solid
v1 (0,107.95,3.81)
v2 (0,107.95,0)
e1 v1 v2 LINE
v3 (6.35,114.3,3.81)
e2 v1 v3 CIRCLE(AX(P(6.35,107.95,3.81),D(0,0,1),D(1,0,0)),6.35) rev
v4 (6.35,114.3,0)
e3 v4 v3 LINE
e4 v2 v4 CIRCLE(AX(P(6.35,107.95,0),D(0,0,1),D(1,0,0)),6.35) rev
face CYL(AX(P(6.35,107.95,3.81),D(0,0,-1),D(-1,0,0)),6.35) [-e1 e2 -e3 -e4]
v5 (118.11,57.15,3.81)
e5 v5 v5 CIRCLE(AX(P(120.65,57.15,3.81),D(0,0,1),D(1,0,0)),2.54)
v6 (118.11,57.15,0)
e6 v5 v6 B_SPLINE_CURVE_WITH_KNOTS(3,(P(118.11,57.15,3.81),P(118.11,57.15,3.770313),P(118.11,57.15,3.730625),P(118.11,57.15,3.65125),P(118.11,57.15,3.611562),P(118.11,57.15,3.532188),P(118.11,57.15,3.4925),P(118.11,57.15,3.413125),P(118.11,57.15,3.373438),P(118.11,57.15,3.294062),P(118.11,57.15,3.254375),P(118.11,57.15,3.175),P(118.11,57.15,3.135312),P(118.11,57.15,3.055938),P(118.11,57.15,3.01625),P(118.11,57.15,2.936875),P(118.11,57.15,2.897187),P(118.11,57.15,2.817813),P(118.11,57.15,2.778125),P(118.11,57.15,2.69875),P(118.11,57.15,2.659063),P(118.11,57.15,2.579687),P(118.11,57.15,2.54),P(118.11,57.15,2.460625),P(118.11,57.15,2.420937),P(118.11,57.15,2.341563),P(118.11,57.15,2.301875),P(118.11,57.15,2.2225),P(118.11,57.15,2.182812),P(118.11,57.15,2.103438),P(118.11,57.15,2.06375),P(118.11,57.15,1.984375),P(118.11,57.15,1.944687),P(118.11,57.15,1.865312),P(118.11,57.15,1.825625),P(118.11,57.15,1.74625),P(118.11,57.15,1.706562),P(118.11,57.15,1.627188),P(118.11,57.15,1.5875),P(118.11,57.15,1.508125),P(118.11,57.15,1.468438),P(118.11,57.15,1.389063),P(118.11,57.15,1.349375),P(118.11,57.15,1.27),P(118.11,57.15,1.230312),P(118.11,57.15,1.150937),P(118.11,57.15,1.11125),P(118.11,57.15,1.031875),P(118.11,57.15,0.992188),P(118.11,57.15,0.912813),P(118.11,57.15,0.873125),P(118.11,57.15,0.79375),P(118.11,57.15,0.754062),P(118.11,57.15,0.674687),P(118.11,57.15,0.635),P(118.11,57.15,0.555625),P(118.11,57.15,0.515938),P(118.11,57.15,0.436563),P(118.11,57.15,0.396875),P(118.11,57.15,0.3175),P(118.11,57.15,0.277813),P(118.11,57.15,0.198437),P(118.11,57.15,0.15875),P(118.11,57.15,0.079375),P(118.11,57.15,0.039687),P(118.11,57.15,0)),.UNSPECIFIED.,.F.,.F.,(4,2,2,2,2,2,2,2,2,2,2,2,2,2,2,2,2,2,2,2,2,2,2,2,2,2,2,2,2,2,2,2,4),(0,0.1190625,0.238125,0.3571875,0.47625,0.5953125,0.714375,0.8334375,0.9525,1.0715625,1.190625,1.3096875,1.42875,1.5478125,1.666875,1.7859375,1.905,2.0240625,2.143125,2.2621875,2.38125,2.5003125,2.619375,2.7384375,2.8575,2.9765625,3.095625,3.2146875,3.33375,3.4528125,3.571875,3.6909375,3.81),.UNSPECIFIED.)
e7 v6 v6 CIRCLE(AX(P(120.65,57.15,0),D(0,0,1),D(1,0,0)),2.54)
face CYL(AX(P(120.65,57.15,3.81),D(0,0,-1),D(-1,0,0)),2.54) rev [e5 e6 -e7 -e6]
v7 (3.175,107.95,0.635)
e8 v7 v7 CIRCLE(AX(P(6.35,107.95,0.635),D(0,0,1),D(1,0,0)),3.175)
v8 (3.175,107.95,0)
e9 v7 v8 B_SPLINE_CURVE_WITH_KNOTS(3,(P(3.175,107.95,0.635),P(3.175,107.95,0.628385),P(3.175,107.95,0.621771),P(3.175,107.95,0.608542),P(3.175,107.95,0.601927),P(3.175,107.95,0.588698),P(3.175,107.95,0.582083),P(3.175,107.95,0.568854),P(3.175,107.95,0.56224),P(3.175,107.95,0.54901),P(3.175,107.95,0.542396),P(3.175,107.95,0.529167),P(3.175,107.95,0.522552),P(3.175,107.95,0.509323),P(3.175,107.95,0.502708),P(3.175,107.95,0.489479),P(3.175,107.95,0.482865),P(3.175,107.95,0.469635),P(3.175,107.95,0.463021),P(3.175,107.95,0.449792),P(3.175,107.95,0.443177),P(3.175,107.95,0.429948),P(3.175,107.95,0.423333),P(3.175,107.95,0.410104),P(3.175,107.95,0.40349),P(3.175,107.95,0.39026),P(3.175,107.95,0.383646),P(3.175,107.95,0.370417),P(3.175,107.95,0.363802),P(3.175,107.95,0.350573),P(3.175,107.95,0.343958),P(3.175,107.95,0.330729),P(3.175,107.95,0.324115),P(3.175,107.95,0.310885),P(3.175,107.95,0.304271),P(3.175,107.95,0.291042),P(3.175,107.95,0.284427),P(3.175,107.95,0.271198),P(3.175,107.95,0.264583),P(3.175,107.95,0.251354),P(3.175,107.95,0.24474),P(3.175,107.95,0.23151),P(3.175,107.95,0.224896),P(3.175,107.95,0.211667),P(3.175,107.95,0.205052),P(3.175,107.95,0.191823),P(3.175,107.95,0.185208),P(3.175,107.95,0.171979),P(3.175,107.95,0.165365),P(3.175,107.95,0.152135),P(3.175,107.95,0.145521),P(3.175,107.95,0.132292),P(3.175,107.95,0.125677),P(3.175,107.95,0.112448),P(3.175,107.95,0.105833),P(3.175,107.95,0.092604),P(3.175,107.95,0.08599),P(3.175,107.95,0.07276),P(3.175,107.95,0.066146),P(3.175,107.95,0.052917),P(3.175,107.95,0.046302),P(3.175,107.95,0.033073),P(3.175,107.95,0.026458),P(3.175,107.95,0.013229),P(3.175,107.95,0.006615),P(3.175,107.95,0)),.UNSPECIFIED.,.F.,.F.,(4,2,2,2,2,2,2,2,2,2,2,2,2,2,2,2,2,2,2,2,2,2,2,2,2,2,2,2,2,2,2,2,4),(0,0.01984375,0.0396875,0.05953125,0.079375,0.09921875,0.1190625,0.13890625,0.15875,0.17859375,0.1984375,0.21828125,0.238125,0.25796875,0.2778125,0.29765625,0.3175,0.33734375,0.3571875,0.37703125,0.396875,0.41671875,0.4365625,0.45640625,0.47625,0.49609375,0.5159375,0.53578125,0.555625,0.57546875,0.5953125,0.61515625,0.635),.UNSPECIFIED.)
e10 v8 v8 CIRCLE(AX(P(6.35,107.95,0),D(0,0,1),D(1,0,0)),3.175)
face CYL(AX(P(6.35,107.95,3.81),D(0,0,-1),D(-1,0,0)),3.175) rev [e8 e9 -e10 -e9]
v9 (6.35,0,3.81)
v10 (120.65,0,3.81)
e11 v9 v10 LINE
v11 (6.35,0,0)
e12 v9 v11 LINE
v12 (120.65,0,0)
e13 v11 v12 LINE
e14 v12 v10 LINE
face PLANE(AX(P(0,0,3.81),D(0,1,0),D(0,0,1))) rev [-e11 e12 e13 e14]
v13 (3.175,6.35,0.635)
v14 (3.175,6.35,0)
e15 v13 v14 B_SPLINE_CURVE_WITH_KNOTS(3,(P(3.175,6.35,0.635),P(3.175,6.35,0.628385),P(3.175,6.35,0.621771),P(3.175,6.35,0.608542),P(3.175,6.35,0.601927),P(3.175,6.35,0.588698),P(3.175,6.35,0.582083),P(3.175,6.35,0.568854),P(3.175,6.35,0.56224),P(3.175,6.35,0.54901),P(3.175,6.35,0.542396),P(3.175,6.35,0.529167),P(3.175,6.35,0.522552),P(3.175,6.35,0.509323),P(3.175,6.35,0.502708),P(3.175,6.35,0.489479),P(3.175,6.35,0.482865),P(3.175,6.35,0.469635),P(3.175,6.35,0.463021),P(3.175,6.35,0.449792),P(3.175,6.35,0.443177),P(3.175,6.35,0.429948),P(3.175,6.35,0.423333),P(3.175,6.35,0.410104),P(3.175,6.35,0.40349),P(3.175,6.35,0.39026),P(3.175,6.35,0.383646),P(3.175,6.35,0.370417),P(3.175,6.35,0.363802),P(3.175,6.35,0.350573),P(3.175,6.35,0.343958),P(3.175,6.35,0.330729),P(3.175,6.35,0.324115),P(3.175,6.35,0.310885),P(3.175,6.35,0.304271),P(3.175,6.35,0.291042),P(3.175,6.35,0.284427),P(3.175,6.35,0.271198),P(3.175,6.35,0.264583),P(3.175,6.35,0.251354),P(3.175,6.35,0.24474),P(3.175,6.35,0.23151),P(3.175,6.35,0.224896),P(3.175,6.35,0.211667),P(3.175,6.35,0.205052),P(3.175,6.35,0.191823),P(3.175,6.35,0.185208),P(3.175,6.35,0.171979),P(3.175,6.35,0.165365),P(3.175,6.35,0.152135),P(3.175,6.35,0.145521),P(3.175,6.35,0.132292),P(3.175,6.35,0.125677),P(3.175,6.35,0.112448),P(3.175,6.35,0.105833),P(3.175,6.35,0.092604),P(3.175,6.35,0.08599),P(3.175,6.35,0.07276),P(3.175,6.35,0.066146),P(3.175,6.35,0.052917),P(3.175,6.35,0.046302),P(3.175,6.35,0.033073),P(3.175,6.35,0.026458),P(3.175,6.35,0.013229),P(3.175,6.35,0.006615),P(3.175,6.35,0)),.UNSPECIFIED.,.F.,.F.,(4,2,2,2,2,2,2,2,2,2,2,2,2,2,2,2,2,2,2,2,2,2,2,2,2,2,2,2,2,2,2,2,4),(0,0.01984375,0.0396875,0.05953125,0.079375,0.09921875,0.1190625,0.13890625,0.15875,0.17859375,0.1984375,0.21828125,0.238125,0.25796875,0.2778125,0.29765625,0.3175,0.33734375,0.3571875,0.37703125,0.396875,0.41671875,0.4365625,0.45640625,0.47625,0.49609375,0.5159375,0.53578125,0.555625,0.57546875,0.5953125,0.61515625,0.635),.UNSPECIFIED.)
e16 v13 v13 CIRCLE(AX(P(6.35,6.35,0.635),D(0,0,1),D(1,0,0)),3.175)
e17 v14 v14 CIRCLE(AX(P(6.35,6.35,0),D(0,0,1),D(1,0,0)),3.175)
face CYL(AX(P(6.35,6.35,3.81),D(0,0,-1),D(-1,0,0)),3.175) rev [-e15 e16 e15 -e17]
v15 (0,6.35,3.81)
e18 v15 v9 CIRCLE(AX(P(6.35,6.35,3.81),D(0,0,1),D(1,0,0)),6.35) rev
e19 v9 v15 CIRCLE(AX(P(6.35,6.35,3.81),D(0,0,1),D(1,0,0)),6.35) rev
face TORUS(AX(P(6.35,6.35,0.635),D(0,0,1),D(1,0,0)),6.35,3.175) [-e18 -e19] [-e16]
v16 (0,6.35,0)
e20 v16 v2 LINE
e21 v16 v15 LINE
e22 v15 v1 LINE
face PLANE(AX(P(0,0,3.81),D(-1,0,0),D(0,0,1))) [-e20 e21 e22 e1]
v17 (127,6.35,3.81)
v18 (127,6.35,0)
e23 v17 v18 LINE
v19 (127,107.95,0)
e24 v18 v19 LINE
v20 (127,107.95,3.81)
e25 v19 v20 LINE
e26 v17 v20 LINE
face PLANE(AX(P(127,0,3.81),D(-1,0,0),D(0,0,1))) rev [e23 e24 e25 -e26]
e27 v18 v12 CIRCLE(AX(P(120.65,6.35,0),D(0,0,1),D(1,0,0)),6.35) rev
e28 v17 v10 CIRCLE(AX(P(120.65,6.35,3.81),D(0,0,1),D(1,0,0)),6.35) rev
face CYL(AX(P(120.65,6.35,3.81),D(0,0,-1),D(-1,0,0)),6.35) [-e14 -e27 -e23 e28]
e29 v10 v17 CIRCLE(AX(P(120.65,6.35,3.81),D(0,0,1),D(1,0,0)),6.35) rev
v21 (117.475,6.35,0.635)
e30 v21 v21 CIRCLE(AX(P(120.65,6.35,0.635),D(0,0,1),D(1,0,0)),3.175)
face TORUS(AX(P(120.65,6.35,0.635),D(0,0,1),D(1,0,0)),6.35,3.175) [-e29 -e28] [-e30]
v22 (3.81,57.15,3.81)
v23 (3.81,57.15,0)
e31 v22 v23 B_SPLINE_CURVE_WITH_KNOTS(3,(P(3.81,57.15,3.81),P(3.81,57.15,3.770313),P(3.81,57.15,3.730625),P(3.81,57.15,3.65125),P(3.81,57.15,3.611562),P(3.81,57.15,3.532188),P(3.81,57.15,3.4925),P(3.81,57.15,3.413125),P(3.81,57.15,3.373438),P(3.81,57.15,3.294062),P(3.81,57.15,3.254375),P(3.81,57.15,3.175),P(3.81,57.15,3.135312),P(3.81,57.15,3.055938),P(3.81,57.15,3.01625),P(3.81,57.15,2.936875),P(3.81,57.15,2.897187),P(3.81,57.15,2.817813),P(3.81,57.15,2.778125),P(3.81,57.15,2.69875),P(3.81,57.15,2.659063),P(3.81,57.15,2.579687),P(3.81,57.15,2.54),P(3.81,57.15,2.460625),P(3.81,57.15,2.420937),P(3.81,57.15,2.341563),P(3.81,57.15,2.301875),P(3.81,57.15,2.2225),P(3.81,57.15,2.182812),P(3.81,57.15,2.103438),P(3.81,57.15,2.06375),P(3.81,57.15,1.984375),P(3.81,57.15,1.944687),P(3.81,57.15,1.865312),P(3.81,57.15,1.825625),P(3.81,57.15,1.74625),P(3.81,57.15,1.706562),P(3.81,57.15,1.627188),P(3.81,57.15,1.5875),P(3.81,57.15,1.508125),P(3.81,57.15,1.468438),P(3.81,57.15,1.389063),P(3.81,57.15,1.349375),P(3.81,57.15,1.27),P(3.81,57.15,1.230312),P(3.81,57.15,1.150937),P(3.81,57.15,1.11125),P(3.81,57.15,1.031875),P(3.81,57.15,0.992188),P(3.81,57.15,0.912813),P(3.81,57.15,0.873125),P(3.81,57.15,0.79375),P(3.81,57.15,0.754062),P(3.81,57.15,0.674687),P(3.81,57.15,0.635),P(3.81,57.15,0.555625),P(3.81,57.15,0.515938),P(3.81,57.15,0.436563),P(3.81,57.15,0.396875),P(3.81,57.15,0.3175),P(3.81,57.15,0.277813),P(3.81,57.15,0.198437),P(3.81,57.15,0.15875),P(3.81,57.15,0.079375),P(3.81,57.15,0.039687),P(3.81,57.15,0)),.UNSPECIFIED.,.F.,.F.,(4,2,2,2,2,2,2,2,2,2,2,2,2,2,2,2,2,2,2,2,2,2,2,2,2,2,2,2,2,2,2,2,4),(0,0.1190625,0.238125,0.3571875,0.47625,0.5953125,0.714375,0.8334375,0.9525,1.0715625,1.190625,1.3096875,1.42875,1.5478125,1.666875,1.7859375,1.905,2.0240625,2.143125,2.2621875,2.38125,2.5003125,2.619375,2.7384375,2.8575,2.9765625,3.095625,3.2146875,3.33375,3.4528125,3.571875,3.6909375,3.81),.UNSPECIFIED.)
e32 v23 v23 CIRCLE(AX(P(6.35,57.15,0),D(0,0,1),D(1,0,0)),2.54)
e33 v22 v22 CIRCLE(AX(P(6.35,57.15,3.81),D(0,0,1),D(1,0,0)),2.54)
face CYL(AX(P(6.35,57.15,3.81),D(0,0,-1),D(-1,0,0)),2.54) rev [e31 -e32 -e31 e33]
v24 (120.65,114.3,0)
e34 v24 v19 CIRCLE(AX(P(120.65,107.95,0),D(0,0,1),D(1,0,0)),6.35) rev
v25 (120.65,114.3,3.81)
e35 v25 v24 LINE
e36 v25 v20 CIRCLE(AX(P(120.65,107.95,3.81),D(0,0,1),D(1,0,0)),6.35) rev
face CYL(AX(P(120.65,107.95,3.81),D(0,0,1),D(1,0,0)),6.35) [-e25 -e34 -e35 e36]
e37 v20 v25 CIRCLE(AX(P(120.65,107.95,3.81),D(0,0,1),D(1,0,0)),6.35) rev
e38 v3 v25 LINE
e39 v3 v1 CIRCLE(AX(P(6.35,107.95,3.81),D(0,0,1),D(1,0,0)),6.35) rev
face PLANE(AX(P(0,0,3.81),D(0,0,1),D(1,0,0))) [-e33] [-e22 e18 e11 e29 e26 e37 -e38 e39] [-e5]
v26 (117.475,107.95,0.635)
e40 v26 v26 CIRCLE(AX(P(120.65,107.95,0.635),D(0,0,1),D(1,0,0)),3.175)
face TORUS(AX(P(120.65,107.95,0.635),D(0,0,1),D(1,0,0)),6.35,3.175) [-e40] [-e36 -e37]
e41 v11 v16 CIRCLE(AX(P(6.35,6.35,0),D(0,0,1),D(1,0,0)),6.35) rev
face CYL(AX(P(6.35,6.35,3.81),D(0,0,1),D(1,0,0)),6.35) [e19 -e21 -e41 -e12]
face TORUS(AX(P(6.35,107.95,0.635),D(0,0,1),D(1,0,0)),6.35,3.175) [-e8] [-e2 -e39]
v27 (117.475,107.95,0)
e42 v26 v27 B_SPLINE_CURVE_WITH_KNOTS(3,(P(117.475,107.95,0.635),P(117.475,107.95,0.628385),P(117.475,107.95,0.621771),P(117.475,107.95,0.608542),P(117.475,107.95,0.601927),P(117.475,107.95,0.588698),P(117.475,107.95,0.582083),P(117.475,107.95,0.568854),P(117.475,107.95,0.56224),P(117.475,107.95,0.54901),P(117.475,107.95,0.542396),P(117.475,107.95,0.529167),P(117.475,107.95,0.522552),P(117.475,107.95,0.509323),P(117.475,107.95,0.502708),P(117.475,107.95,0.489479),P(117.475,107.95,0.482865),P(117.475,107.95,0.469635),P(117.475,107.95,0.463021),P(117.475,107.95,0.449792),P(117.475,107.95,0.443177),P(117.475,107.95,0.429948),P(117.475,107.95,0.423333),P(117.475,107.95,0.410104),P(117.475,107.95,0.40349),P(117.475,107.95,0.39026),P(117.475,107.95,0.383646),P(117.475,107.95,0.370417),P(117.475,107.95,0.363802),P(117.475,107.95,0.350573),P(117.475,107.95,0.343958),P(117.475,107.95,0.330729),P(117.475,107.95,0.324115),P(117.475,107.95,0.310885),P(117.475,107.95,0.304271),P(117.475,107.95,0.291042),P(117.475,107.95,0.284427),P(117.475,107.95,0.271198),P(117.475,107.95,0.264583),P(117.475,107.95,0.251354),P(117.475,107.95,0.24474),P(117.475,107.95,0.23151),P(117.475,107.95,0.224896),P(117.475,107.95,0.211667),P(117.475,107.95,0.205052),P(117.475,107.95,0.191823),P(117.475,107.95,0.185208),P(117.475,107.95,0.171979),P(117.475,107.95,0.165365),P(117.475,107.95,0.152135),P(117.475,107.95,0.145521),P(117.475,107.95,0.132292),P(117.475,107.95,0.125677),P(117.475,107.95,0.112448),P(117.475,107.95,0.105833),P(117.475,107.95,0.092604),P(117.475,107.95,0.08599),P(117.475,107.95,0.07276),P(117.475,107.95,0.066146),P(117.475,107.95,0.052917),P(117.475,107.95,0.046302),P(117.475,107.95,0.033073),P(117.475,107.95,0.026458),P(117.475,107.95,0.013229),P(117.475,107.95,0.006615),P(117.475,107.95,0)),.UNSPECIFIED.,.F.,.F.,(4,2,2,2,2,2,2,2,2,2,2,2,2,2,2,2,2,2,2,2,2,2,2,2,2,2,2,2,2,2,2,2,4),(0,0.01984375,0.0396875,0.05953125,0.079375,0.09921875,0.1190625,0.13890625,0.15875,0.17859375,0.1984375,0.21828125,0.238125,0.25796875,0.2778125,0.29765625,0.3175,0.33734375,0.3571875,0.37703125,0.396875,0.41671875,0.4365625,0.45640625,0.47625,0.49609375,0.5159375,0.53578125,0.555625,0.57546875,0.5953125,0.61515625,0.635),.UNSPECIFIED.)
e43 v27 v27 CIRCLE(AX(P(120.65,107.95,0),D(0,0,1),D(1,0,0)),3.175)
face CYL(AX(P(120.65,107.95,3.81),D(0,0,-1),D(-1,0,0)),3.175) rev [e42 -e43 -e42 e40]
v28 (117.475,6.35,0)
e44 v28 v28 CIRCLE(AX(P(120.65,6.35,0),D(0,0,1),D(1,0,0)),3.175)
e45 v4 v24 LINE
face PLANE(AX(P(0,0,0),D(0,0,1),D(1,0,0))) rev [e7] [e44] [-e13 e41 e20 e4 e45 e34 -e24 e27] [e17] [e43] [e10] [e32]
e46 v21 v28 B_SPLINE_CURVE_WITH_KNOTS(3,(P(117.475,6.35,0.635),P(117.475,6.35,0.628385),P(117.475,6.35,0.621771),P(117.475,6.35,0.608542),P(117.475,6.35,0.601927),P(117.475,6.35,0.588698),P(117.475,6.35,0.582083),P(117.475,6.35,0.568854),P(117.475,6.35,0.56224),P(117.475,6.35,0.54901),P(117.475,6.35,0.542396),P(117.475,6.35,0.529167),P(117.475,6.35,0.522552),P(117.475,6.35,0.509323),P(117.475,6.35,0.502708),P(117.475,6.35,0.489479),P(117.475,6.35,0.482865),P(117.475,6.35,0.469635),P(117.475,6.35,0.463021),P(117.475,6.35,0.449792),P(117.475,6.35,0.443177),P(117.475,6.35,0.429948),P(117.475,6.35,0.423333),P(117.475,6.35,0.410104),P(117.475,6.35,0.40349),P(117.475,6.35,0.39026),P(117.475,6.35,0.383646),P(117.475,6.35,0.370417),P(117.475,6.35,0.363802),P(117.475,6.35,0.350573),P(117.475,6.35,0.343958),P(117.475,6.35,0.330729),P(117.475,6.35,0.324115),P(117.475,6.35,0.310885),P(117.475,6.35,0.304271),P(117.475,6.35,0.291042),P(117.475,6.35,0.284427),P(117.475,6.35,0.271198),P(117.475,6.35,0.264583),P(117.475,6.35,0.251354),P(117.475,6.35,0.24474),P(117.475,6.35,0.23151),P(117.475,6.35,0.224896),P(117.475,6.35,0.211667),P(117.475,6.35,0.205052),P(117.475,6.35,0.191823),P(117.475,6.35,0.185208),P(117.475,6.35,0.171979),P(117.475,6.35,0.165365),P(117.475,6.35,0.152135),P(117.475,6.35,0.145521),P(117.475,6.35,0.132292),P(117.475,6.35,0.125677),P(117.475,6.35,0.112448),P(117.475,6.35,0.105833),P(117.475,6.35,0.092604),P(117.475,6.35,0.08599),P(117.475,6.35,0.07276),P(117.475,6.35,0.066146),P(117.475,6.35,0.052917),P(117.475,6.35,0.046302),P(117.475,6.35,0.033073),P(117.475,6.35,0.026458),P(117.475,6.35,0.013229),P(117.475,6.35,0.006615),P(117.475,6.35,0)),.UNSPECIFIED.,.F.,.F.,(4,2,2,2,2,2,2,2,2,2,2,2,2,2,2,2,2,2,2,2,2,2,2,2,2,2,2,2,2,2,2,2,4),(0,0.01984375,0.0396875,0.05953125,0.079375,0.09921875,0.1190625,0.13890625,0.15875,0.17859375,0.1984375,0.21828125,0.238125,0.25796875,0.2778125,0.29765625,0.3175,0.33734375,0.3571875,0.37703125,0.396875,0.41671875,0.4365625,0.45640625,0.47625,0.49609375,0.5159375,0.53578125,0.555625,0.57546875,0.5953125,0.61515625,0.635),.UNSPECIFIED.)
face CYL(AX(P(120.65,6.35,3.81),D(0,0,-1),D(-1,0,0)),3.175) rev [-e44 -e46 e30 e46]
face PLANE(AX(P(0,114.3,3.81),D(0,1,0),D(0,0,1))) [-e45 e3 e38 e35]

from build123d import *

# Parameters (mm, degrees)
SKETCH2_W           = 127
SKETCH2_H           = 114.3
SKETCH2_R           = 3.175
SKETCH2_R_2         = 2.54
BOSS_EXTRUDE2_DEPTH = 3.81
FILLET1_R           = 3.175
FILLET2_R           = 6.35


with BuildPart() as part:
    # Sketch2 → Boss-Extrude2 (new body)
    with BuildSketch(Plane.XY):
        with Locations((63.5, 57.15)):
            Rectangle(SKETCH2_W, SKETCH2_H)
        with Locations(Location((6.35, 107.95, 0), (0, 0, 180))):
            Circle(SKETCH2_R, mode=Mode.SUBTRACT)
        with Locations(Location((120.65, 107.95, 0), (0, 0, 180))):
            Circle(SKETCH2_R, mode=Mode.SUBTRACT)
        with Locations(Location((120.65, 6.35, 0), (0, 0, 180))):
            Circle(SKETCH2_R, mode=Mode.SUBTRACT)
        with Locations(Location((6.35, 6.35, 0), (0, 0, 180))):
            Circle(SKETCH2_R, mode=Mode.SUBTRACT)
        with Locations(Location((6.35, 57.15, 0), (0, 0, 180))):
            Circle(SKETCH2_R_2, mode=Mode.SUBTRACT)
        with Locations(Location((120.65, 57.15, 0), (0, 0, 180))):
            Circle(SKETCH2_R_2, mode=Mode.SUBTRACT)
    extrude(amount=BOSS_EXTRUDE2_DEPTH)

    # Fillet1
    fillet1_edges = [part.edges().sort_by_distance(p)[0] for p in [
        (123.825, 107.95, 3.81),
        (9.525, 107.95, 3.81),
        (9.525, 6.35, 3.81),
        (123.825, 6.35, 3.81),
    ]]
    fillet(fillet1_edges, radius=FILLET1_R - 0.0001)  # a hair under: the kernel refuses the full size

    # Fillet2
    fillet2_edges = [part.edges().sort_by_distance(p)[0] for p in [
        (127, 114.3, 1.905),
        (127, 0, 1.905),
        (0, 0, 1.905),
        (0, 114.3, 1.905),
    ]]
    fillet(fillet2_edges, radius=FILLET2_R)


solid = part.part
